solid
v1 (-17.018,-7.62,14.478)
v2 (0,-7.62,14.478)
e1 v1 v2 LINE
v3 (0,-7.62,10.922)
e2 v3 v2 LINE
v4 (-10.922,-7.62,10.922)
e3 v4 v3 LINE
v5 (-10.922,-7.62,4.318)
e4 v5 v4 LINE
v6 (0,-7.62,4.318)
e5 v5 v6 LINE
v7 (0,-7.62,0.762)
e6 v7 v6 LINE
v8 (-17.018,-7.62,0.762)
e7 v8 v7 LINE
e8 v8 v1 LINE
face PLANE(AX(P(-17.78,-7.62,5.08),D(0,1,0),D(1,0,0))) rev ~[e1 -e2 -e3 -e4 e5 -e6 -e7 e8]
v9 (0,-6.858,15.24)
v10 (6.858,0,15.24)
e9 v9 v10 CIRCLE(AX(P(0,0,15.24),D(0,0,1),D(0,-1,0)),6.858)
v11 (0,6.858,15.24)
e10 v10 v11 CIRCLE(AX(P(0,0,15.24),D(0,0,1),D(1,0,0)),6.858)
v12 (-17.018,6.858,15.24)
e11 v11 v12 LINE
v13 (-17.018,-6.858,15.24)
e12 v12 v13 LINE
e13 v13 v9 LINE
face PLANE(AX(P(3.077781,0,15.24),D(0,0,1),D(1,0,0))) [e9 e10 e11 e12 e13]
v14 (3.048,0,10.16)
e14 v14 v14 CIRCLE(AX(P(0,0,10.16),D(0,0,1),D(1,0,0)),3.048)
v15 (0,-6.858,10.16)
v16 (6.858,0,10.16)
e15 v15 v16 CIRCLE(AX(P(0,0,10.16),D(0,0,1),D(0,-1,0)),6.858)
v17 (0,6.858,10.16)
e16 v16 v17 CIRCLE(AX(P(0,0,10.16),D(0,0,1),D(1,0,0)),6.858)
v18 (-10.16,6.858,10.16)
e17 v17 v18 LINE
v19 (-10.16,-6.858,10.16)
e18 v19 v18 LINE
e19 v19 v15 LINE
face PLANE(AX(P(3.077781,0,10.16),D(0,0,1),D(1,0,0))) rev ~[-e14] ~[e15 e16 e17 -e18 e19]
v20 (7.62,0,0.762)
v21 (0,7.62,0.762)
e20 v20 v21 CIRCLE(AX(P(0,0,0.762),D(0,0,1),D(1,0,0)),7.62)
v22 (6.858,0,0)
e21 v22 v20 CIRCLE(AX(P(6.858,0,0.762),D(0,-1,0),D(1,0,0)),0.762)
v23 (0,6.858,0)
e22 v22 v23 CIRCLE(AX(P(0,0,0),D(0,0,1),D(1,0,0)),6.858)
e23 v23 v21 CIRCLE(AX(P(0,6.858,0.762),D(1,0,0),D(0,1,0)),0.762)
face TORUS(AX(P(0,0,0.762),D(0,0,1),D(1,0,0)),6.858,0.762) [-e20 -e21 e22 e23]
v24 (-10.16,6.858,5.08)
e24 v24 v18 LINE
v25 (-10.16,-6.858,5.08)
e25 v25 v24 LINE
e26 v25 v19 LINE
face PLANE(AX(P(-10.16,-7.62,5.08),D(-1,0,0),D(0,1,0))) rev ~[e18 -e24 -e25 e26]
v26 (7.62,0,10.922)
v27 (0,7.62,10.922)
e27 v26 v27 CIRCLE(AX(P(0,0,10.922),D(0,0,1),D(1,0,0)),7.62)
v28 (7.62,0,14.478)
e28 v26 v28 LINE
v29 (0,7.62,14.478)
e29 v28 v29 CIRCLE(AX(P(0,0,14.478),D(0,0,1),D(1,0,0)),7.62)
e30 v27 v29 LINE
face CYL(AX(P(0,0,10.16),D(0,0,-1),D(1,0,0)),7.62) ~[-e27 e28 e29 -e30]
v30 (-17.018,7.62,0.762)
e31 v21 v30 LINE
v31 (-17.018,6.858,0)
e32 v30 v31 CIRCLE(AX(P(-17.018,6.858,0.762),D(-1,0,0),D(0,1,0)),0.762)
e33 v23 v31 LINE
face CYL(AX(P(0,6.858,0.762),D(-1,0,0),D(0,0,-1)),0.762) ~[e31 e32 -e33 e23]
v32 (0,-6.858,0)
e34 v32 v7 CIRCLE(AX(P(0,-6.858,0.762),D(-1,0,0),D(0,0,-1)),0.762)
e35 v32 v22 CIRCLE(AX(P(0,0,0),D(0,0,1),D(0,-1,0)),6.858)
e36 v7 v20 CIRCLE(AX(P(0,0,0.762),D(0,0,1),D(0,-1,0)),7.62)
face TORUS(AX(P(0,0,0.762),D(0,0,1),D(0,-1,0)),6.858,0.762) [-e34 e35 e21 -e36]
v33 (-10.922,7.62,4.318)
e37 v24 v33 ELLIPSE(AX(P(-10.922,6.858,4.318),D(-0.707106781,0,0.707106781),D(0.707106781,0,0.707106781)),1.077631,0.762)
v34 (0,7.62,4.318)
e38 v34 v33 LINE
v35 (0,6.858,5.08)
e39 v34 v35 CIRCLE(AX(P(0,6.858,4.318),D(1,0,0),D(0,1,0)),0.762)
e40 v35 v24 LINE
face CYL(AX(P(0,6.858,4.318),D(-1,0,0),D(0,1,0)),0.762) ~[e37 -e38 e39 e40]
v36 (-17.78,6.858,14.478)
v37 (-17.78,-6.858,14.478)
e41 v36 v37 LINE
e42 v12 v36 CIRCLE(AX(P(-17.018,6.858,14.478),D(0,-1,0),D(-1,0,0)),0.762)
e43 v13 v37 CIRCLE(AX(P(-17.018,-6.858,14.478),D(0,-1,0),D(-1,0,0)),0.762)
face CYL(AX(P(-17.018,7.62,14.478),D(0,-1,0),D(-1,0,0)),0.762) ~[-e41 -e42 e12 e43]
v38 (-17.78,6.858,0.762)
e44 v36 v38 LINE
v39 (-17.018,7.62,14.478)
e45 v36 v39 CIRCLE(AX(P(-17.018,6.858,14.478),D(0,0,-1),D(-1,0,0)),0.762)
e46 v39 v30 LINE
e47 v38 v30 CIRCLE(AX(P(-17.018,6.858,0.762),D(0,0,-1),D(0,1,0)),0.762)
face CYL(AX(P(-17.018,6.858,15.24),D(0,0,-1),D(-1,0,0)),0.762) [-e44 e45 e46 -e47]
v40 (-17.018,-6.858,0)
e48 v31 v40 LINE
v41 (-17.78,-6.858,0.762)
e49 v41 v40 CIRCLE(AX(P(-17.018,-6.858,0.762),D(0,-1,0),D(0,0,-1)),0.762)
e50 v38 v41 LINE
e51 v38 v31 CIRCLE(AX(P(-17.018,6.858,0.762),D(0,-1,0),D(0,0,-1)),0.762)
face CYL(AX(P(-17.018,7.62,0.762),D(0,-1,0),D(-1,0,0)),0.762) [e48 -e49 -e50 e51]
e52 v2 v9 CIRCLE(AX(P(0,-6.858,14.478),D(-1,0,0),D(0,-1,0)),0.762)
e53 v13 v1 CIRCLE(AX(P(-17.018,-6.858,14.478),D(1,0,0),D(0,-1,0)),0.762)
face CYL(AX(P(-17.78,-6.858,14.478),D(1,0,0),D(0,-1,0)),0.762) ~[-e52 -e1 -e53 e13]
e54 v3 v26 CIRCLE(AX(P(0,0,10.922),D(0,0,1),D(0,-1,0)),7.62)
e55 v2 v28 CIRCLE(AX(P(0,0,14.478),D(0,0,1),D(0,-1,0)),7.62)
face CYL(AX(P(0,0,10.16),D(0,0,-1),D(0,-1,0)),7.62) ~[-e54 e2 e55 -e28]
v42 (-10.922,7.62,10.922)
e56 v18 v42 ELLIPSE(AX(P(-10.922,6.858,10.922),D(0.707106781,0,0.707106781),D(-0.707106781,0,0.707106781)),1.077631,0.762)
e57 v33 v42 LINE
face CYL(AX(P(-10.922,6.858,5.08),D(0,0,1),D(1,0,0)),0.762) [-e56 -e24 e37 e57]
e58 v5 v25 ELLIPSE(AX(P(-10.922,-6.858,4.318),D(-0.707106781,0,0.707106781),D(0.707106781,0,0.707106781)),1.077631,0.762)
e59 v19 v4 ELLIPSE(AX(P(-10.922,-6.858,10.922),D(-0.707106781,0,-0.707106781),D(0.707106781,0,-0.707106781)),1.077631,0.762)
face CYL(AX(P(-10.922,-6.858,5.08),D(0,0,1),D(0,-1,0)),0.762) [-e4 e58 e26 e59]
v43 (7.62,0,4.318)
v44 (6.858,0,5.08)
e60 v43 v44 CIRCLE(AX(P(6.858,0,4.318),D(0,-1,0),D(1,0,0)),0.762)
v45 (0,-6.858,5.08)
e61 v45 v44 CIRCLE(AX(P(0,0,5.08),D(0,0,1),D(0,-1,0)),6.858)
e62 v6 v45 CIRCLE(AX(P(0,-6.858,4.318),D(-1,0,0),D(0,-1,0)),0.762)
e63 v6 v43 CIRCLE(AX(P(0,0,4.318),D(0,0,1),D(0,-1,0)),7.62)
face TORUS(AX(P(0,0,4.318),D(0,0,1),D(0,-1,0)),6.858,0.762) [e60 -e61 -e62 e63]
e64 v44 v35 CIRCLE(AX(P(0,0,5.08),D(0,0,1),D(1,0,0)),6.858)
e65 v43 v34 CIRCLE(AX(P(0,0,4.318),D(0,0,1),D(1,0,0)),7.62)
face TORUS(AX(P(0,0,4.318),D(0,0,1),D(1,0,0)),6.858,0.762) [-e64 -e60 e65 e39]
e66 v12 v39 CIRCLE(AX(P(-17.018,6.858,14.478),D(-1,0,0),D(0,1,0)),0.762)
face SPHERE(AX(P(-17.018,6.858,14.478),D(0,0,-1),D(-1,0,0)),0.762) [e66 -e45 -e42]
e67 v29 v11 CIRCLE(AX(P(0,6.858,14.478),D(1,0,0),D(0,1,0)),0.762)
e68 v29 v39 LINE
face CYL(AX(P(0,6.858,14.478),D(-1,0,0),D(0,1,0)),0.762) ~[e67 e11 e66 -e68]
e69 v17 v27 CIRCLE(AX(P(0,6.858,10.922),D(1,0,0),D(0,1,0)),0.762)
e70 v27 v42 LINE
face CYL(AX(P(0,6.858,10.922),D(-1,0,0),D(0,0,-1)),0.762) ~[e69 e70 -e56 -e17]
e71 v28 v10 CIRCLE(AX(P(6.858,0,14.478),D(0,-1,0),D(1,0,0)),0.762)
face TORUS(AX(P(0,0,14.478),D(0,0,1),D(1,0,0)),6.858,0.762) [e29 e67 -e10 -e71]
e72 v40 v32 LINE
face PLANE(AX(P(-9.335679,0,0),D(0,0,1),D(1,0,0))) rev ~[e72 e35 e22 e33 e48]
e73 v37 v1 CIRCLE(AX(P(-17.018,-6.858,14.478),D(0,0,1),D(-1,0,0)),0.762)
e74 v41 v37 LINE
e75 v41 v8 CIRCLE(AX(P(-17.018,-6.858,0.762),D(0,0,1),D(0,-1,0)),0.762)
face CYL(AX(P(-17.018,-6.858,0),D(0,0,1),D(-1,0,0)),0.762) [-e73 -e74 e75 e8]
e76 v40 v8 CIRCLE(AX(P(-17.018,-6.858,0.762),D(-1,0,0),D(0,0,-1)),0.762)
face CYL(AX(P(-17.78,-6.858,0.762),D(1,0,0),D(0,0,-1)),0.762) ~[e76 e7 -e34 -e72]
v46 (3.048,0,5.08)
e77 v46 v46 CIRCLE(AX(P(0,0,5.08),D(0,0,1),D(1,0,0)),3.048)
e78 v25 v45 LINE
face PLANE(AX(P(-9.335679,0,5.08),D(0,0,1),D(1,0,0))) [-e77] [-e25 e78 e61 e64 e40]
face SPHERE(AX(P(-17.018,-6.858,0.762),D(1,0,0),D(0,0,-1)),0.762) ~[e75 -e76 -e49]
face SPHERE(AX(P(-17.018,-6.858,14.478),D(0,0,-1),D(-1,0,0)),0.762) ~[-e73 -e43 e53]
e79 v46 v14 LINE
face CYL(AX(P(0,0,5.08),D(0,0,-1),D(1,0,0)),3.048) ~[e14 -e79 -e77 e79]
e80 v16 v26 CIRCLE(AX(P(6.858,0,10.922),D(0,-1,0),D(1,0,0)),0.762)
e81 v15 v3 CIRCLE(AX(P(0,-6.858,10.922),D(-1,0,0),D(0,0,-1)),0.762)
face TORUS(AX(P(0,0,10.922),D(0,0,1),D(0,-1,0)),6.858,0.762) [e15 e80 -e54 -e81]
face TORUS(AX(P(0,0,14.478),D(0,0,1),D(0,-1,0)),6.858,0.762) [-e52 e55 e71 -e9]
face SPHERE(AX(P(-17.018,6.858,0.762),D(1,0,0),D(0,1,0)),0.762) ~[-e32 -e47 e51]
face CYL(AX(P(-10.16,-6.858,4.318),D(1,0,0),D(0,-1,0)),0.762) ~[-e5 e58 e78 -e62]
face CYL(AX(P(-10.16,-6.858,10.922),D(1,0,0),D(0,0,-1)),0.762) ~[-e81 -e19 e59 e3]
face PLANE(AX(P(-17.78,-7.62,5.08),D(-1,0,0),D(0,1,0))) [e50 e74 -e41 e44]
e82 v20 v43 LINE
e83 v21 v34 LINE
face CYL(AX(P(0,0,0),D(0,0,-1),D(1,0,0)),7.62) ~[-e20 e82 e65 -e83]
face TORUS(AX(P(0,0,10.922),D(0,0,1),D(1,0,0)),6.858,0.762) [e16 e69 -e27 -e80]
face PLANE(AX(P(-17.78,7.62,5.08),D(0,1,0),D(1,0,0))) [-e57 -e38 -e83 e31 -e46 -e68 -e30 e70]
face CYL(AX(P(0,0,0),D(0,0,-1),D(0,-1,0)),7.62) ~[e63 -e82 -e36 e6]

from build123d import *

# Parameters (mm, degrees)
F1_DEPTH = 5.08
F2_R     = 3.048
F3_DEPTH = 5.08
F5_DEPTH = 5.08
F6_W     = 7.62
F6_H     = 15.24
F7_DEPTH = 5.08
F8_R     = 0.762


# Not quite as in the source:
# - a feature names something its author has since deleted; it is built from what else it names


with BuildPart() as f1:
    # F0 (on Top) → F1 (new body)
    with BuildSketch(Plane.XY):
        with BuildLine():
            ThreePointArc((0, -7.62), (-7.62, 0), (0, 7.62))
            Line((0, 7.62), (-17.78, 7.62))
            Line((-17.78, 7.62), (-17.78, -7.62))
            Line((-17.78, -7.62), (0, -7.62))
        make_face()
        with BuildLine():
            Line((0, -7.62), (0, 7.62))
            ThreePointArc((0, 7.62), (-7.62, 0), (0, -7.62))
        make_face()
        with BuildLine():
            ThreePointArc((0, -7.62), (5.3881536726, -5.3881536726), (7.62, 0))
            ThreePointArc((7.62, 0), (5.3881536726, 5.3881536726), (0, 7.62))
            Line((0, 7.62), (0, -7.62))
        make_face()
    extrude(amount=F1_DEPTH)

    # F2 (on face) → F3 (join)
    with BuildSketch(Plane.XY.offset(5.08)):
        Circle(F2_R)
    extrude(amount=F3_DEPTH)

    # F4 (on face) → F5 (join)
    with BuildSketch(Plane.XY.offset(10.16)):
        with BuildLine():
            ThreePointArc((0, -7.62), (5.3881536726, -5.3881536726), (7.62, 0))
            ThreePointArc((7.62, 0), (5.3881536726, 5.3881536726), (0, 7.62))
            Line((0, 7.62), (0, 3.048))
            ThreePointArc((0, 3.048), (2.1552614691, 2.1552614691), (3.048, 0))
            ThreePointArc((3.048, 0), (2.1552614691, -2.1552614691), (0, -3.048))
            Line((0, -3.048), (0, -7.62))
        make_face()
        with BuildLine():
            Line((0, 3.048), (0, 7.62))
            ThreePointArc((0, 7.62), (-7.62, 0), (0, -7.62))
            Line((0, -7.62), (0, -3.048))
            ThreePointArc((0, -3.048), (-3.048, 0), (0, 3.048))
        make_face()
        with BuildLine():
            ThreePointArc((0, -7.62), (-7.62, 0), (0, 7.62))
            Line((0, 7.62), (-17.78, 7.62))
            Line((-17.78, 7.62), (-17.78, -7.62))
            Line((-17.78, -7.62), (0, -7.62))
        make_face()
        with BuildLine():
            ThreePointArc((0, -7.62), (5.3881536726, -5.3881536726), (7.62, 0))
            ThreePointArc((7.62, 0), (5.3881536726, 5.3881536726), (0, 7.62))
            Line((0, 7.62), (0, -7.62))
        make_face()
        with BuildLine():
            Line((0, -7.62), (0, 7.62))
            ThreePointArc((0, 7.62), (-7.62, 0), (0, -7.62))
        make_face()
    extrude(amount=F5_DEPTH)

    # F6 (on face) → F7 (join)
    with BuildSketch(Plane.XY.offset(5.08)):
        with Locations((-13.97, 0)):
            Rectangle(F6_W, F6_H)
    extrude(amount=F7_DEPTH)

    # F8
    f8_edges = [f1.edges().sort_by_distance(p)[0] for p in [
        (-8.89, 7.62, 0),
        (7.62, 0, 0),
        (-8.89, -7.62, 0),
        (7.62, 0, 15.24),
        (-17.78, 7.62, 7.62),
        (-17.78, 0, 0),
        (-17.78, -7.62, 7.62),
        (-17.78, 0, 15.24),
        (7.62, 0, 5.08),
        (7.62, 0, 10.16),
        (-10.16, -7.62, 7.62),
        (-10.16, 7.62, 7.62),
        (-8.89, 7.62, 15.24),
        (-8.89, -7.62, 15.24),
        (-5.08, -7.62, 5.08),
        (-5.08, 7.62, 5.08),
        (-5.08, -7.62, 10.16),
        (-5.08, 7.62, 10.16),
    ]]
    fillet(f8_edges, radius=F8_R)


solid = f1.part
